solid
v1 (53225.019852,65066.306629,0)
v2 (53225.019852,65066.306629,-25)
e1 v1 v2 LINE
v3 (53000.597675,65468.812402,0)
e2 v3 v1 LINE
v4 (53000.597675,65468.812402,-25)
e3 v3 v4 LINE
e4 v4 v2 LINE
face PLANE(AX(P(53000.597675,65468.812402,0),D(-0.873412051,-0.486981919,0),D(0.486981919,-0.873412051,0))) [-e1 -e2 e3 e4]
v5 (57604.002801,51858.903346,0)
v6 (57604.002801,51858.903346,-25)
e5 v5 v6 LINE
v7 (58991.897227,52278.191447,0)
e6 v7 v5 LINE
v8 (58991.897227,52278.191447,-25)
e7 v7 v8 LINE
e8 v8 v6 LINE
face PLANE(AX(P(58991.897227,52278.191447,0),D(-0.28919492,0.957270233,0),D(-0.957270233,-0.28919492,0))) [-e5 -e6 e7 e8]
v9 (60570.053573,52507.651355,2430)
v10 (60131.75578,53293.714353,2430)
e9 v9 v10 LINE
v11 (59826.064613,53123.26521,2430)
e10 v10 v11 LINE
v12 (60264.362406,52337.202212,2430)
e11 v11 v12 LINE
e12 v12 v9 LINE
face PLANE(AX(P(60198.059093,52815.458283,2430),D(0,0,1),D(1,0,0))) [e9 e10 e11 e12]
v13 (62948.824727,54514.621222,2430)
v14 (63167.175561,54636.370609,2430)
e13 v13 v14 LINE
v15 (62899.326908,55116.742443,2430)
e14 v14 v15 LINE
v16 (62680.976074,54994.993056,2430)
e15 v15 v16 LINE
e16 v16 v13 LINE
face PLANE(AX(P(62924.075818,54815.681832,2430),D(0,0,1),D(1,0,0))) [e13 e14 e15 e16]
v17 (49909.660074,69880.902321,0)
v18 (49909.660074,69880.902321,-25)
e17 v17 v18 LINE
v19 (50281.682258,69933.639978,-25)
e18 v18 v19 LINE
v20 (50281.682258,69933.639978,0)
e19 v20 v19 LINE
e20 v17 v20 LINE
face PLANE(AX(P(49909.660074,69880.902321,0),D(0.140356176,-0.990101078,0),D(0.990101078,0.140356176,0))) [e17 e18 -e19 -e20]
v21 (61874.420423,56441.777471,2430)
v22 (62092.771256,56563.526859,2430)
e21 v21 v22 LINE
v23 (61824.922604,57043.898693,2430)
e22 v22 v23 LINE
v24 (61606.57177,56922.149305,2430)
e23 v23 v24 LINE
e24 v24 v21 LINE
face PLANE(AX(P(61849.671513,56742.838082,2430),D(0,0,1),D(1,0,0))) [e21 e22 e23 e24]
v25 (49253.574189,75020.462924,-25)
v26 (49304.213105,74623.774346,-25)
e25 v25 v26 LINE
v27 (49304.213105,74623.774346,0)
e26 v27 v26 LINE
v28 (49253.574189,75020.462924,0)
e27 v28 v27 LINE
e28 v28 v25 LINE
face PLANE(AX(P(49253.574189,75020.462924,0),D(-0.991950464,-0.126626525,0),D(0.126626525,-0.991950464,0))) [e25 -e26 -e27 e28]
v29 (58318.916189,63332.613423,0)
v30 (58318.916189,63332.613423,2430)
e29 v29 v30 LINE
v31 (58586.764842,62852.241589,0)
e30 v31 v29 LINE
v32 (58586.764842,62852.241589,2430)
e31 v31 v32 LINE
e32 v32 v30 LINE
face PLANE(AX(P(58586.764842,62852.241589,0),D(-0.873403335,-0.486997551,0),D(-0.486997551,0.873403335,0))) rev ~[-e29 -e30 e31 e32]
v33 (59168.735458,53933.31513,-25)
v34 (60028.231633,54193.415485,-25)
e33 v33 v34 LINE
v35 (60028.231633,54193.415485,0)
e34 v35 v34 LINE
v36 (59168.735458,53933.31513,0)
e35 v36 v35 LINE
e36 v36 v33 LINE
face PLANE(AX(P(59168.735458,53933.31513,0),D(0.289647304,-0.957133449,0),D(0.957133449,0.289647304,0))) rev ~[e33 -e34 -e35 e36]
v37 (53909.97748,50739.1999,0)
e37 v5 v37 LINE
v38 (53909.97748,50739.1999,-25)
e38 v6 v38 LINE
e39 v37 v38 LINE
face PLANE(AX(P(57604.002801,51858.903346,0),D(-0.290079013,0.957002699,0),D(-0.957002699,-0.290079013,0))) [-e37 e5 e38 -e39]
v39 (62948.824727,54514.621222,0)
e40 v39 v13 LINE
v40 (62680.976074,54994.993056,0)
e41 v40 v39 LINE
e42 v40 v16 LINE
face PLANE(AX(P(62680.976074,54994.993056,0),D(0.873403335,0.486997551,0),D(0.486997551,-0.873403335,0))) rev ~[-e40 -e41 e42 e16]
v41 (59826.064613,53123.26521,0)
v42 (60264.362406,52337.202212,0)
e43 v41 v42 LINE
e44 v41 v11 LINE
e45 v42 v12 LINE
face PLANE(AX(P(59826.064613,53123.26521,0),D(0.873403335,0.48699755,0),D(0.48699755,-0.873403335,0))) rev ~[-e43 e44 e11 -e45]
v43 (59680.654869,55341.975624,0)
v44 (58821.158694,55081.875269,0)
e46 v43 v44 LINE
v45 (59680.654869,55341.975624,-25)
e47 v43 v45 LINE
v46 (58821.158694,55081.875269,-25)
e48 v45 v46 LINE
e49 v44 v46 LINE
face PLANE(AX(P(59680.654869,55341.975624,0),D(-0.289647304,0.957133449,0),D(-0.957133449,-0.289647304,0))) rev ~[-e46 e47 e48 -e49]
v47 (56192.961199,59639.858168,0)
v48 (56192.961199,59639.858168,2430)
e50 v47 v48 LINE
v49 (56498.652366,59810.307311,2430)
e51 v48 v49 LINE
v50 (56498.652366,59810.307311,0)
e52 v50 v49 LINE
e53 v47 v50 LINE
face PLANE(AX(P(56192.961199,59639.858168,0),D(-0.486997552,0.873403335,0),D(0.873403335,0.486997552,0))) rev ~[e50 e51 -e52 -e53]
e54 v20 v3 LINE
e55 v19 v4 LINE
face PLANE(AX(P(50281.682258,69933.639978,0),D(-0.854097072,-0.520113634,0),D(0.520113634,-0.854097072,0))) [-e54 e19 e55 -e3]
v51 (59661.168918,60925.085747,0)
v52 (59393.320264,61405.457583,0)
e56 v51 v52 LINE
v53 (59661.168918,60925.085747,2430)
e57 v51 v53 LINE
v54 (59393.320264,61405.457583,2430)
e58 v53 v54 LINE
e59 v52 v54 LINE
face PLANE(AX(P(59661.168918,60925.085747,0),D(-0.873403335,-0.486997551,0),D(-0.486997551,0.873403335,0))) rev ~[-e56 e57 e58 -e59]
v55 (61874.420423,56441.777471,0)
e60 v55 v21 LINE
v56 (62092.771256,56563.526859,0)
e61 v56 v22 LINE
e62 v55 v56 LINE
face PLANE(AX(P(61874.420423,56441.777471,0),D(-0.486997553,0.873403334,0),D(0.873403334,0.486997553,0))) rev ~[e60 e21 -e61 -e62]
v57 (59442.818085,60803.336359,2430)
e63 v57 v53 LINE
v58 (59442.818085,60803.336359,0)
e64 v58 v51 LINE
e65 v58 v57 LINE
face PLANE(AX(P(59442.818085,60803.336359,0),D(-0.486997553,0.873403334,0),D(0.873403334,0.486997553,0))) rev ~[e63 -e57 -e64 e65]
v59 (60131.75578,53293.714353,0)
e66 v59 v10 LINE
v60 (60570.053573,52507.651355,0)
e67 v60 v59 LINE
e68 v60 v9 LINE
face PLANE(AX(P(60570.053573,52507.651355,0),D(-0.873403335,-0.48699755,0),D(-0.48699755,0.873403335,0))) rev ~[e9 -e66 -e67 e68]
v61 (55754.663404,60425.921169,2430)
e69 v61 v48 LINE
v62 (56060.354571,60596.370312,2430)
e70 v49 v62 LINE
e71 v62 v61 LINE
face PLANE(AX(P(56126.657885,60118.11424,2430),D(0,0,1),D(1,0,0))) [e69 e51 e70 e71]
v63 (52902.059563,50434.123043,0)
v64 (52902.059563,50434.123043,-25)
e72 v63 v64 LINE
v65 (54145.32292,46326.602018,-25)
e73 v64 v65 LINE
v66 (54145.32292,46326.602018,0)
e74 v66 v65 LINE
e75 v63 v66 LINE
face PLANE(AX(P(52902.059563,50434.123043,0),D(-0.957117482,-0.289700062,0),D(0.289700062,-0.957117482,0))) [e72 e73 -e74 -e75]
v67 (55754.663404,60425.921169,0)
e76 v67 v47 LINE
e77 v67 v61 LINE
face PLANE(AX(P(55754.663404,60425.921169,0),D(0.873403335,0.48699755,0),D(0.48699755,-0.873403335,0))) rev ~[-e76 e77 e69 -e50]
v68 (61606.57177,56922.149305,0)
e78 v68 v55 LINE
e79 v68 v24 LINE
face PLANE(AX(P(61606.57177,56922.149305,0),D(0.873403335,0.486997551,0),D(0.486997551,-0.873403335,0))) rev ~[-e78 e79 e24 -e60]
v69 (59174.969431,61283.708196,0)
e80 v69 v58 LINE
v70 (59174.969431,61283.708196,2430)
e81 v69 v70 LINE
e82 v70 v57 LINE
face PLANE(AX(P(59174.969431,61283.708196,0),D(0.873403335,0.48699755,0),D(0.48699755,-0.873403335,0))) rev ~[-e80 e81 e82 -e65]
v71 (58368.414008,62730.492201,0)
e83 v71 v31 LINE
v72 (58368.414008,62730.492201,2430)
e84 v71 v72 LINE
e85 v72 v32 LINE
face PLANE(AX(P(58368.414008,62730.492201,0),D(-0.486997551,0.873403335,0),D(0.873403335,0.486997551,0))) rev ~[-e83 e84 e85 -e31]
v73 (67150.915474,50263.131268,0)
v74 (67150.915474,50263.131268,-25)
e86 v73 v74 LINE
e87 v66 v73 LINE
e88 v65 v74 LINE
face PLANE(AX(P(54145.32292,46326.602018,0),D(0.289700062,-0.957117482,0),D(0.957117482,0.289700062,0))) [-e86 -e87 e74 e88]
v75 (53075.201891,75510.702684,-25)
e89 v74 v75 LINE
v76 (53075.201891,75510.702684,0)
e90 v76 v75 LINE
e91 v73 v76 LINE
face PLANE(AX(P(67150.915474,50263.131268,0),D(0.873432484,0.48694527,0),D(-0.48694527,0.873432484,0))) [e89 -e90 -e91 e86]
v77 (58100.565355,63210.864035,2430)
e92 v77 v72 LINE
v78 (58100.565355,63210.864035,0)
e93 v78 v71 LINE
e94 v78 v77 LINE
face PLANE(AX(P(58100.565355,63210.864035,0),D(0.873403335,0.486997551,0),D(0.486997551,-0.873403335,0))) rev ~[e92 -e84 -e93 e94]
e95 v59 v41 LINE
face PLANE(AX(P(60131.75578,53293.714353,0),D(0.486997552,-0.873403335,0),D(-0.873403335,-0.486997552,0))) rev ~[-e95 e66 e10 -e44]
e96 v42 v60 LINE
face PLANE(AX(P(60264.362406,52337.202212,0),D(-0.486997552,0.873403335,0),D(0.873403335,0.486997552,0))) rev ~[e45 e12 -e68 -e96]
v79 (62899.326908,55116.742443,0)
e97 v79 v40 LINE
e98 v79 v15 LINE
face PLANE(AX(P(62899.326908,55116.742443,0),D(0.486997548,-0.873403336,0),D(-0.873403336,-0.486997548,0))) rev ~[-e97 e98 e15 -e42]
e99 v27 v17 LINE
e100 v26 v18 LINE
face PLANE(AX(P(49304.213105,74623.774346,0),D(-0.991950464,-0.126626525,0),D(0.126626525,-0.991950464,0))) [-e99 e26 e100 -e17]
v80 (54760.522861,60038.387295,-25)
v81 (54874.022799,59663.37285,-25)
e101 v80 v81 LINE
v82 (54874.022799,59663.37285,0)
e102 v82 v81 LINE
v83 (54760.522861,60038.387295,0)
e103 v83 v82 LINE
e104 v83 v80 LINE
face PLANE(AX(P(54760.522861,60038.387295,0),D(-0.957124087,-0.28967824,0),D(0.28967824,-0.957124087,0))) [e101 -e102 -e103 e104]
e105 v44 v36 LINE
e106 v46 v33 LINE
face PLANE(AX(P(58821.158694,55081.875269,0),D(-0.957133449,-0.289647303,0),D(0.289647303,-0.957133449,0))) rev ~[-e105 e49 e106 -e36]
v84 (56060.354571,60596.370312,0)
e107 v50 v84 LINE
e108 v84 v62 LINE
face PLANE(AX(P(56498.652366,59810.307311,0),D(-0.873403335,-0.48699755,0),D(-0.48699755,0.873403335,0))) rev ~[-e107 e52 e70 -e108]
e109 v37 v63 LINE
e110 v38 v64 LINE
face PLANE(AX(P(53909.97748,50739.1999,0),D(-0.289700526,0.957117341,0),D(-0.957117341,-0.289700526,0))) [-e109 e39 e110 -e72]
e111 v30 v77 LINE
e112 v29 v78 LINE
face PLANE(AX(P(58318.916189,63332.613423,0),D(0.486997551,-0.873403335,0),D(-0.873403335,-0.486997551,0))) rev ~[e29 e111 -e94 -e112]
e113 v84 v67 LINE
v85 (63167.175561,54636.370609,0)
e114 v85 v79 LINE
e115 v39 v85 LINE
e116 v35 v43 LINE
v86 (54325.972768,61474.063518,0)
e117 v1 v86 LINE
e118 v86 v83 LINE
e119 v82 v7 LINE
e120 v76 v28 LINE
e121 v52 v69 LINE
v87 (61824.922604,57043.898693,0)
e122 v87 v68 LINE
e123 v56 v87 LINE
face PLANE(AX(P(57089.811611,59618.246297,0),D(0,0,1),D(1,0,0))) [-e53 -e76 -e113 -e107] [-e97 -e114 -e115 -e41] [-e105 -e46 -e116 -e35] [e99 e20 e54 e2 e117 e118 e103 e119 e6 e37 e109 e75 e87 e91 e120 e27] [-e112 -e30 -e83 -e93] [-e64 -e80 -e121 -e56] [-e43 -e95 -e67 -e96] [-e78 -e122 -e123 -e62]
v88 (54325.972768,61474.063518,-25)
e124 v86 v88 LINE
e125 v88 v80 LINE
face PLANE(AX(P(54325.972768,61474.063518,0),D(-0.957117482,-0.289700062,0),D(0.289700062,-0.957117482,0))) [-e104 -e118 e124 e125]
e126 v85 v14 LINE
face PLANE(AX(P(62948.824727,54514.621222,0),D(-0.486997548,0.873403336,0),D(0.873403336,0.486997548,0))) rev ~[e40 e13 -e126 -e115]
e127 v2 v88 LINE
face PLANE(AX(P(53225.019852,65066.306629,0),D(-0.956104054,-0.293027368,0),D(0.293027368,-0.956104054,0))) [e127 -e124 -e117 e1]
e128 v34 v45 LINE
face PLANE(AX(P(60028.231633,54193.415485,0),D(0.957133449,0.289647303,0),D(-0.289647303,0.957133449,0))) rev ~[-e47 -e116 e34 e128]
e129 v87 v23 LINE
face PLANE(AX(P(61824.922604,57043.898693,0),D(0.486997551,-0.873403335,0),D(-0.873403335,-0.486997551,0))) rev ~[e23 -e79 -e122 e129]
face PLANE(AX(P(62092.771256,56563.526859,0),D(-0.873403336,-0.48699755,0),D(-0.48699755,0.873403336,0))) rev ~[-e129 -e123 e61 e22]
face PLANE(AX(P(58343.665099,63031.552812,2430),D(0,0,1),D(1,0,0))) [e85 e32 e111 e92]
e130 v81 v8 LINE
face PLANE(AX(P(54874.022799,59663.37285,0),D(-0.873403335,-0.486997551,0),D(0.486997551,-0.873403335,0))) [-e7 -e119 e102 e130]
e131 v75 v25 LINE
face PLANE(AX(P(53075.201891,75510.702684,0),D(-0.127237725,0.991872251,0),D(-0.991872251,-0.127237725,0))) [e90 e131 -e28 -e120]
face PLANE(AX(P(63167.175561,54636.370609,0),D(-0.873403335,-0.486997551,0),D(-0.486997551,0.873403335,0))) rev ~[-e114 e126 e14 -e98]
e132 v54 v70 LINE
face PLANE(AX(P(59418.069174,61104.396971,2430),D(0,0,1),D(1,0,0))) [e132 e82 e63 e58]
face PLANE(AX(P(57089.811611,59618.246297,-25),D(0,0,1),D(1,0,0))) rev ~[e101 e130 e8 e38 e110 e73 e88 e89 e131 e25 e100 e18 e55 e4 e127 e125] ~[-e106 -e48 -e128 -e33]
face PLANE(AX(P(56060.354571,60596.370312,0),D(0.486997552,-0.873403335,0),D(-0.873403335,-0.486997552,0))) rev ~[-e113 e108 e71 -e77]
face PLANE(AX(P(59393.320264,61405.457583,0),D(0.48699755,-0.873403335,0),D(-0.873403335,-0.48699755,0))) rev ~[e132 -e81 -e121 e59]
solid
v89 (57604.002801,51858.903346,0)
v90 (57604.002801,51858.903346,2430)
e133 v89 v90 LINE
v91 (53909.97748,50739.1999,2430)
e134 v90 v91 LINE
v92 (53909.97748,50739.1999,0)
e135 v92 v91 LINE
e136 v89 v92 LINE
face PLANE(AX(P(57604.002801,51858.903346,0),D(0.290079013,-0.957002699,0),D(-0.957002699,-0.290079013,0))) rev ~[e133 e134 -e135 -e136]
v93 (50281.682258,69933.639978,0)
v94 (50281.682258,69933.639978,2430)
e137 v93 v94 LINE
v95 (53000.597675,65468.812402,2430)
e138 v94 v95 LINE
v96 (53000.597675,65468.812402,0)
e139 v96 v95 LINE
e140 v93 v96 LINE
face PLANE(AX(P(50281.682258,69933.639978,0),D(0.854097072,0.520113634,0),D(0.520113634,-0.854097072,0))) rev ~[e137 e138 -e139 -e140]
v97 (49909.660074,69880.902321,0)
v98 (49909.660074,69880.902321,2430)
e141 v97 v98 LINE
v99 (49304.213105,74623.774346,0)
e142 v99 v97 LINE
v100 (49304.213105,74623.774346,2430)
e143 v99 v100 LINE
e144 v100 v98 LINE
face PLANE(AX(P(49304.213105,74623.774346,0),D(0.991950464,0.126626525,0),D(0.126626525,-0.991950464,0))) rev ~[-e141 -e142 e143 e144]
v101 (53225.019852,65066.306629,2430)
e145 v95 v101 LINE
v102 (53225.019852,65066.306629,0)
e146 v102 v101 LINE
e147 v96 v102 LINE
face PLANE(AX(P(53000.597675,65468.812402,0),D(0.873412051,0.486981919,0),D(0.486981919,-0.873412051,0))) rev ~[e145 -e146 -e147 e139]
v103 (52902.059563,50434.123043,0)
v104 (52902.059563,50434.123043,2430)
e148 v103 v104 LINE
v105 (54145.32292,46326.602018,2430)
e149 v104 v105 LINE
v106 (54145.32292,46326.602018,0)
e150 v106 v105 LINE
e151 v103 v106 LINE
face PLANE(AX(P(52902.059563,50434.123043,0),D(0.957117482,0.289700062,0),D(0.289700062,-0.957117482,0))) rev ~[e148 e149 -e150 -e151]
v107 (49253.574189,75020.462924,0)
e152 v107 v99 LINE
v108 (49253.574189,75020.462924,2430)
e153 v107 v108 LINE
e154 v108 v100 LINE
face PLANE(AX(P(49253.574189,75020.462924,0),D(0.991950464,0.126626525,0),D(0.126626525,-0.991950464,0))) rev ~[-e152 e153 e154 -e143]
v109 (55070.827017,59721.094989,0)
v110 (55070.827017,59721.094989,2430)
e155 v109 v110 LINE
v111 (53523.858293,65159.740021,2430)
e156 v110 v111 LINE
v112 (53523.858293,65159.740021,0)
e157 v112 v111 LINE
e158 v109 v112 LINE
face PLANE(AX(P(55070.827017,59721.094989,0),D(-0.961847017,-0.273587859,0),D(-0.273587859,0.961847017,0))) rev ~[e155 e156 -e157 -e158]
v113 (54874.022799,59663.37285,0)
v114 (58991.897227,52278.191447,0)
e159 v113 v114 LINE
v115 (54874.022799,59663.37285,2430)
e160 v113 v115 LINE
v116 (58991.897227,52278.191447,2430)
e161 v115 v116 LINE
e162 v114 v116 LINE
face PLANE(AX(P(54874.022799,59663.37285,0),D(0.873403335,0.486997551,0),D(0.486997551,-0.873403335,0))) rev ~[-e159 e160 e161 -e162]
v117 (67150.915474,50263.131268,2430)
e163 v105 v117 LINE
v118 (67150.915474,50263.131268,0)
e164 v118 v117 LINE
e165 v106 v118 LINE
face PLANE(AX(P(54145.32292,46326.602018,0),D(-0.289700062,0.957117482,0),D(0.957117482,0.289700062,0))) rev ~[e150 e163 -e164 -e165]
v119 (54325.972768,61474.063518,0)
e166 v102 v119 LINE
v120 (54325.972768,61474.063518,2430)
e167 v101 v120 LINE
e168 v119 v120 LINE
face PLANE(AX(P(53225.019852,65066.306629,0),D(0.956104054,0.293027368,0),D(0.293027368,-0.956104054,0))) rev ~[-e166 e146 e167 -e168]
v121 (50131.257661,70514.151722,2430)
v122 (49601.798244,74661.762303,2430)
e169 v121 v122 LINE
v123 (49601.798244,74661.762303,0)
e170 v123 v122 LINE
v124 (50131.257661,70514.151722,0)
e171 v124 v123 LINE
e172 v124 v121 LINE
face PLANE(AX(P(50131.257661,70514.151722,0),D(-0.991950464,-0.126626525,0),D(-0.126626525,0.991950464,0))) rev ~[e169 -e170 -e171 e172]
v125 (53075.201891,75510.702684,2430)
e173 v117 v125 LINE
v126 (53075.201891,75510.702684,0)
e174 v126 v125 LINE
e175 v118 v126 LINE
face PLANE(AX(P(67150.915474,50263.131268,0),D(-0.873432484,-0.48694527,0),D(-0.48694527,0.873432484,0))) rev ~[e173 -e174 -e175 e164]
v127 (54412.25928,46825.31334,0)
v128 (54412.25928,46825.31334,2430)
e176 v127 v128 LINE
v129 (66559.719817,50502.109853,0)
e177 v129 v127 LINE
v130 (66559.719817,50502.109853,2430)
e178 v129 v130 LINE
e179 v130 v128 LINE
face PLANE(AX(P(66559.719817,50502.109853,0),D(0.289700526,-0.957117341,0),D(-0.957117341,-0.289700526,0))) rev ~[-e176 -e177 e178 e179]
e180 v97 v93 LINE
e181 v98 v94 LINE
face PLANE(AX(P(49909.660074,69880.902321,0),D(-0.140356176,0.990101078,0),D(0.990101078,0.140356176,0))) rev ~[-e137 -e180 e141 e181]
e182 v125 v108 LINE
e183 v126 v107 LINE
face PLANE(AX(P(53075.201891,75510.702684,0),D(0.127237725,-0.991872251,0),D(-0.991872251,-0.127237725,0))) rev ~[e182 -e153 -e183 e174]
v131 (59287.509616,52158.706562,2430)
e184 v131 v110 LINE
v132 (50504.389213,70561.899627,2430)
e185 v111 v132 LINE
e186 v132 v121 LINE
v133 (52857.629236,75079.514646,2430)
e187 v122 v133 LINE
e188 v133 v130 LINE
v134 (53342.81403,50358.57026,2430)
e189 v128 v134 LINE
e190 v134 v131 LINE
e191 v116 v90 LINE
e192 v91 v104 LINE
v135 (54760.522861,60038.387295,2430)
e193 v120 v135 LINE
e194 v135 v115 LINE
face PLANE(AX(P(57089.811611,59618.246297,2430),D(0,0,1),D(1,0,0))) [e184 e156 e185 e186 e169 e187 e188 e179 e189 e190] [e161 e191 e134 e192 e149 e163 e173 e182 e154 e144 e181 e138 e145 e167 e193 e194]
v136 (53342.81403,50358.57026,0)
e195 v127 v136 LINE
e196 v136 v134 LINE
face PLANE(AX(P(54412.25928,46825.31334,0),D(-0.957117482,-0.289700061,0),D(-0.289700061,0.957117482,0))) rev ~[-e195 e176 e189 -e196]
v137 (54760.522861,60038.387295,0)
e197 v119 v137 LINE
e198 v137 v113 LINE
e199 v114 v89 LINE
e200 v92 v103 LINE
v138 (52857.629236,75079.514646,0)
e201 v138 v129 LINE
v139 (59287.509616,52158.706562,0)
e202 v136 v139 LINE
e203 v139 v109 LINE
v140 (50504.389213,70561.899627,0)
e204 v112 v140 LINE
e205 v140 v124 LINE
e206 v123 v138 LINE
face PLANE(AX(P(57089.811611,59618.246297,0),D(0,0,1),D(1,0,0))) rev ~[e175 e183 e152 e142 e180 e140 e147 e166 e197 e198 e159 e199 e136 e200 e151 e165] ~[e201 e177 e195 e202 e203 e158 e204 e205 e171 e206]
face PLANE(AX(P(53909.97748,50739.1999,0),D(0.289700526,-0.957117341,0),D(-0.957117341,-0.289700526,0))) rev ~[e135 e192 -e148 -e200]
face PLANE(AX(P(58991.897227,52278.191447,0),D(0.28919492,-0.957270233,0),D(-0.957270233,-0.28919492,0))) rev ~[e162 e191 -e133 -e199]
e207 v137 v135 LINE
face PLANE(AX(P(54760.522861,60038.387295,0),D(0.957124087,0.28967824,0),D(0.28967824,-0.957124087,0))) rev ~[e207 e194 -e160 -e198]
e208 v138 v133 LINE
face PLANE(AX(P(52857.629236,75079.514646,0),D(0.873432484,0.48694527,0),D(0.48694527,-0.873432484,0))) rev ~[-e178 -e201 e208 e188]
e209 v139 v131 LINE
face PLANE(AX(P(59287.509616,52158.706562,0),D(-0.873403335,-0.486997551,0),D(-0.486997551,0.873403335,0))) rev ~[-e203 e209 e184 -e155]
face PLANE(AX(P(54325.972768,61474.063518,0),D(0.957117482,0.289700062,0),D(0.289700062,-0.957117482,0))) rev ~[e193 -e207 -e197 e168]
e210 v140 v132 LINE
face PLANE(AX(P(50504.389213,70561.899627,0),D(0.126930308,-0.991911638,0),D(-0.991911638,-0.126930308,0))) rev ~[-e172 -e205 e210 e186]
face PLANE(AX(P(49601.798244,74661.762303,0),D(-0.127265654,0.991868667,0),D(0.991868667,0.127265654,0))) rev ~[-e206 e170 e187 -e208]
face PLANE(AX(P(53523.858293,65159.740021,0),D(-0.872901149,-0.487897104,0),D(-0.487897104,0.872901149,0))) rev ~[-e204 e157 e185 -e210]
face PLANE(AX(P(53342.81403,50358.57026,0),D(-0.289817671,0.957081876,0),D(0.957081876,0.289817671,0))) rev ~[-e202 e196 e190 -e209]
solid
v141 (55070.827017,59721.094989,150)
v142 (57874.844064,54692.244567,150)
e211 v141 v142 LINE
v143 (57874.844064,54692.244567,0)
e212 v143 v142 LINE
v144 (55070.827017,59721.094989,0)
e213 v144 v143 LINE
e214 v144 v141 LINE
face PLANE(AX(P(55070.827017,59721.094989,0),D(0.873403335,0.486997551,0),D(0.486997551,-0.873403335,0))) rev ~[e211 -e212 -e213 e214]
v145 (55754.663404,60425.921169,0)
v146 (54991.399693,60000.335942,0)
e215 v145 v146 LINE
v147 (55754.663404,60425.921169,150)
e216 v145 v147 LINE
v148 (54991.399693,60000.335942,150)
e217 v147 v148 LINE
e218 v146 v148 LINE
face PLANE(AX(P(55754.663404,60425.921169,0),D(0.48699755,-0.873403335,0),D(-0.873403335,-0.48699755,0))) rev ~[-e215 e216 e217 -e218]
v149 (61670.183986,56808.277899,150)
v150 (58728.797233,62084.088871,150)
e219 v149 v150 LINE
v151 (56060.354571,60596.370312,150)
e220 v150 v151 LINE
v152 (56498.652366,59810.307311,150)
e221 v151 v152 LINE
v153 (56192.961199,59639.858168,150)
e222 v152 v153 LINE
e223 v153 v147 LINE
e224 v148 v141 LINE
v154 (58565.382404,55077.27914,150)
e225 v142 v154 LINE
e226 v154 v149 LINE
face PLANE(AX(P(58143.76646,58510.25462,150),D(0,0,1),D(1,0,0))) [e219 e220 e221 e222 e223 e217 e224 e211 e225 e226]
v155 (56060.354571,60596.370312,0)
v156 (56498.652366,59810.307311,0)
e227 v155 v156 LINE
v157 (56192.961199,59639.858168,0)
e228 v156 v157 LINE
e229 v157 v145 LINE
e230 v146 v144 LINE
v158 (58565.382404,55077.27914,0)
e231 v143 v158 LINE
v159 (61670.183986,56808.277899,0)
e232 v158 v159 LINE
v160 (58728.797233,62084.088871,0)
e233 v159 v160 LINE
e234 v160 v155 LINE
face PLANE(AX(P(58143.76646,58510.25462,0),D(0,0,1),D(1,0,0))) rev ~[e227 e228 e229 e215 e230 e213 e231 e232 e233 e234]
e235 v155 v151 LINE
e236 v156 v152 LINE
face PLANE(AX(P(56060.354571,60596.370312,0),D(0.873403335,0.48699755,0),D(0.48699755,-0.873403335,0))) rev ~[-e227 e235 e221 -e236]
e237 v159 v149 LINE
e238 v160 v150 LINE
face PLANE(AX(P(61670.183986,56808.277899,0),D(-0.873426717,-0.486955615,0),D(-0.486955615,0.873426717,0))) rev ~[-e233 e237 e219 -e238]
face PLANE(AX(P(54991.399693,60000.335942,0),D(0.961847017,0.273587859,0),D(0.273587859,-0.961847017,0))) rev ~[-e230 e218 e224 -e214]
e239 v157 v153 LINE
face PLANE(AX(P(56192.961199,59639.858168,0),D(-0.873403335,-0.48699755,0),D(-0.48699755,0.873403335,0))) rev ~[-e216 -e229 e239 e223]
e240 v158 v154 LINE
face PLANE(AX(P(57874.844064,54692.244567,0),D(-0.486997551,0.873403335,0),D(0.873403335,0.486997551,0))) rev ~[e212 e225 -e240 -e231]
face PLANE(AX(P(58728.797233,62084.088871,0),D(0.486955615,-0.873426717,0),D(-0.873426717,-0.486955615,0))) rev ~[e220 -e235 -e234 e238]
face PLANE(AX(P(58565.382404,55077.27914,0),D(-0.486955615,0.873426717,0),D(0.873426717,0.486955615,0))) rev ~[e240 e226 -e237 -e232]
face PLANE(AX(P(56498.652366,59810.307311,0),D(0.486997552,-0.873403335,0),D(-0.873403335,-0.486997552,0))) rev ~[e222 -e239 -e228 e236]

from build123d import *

# Parameters (mm, degrees)
F3_DEPTH  = 2430
F5_DEPTH  = 25
F7_DEPTH  = 2430
F9_DEPTH  = 150
F11_DEPTH = 25.001


# Not quite as in the source:
# - ends of sketch curves that miss each other by under 0.0002 mm in the source are joined


with BuildPart() as f3:
    # F2 (on Top) → F3 (new body)
    with BuildSketch(Plane.XY):
        Polygon((52902.0595629306, 50434.1230428591), (54145.32292, 46326.602018), (54431.4219269024, 46413.1983883223), (67150.915474, 50263.131268), (53075.201891, 75510.702684), (49253.5741891713, 75020.4629237414), (49304.213105, 74623.774346), (49909.660074, 69880.902321), (50281.682258, 69933.639978), (53000.597675, 65468.812402), (53225.019852, 65066.306629), (54325.972768, 61474.063518), (54760.522861, 60038.387295), (54874.022799, 59663.37285), (58991.897227, 52278.191447), (57604.002801, 51858.903346), (53909.97748, 50739.1999), align=None)
        Polygon((54412.25928, 46825.31334), (53342.81403, 50358.57026), (59287.509616, 52158.706562), (55070.827017, 59721.094989), (53523.858293, 65159.740021), (50504.389213421, 70561.8996273451), (50131.257661, 70514.151722), (49601.798244, 74661.762303), (52857.629236, 75079.514646), (66559.719817, 50502.109853), align=None, mode=Mode.SUBTRACT)
    extrude(amount=F3_DEPTH)


with BuildPart() as f5:
    # F4 (on Top) → F5 (new body)
    with BuildSketch(Plane.XY):
        Polygon((54760.522861, 60038.387295), (54874.022799, 59663.37285), (58991.897227, 52278.191447), (57604.002801, 51858.903346), (53909.97748, 50739.1999), (52902.0595629306, 50434.1230428591), (54145.32292, 46326.602018), (67150.915474, 50263.131268), (53075.201891, 75510.702684), (49253.5741891713, 75020.4629237414), (49304.213105, 74623.774346), (49909.660074, 69880.902321), (50281.682258, 69933.639978), (53000.597675, 65468.812402), (53225.019852, 65066.306629), (54325.972768, 61474.063518), align=None)
    extrude(amount=-F5_DEPTH)

    # F6 (on Top) → F7 (join)
    with BuildSketch(Plane.XY):
        Polygon((63167.175561, 54636.370609), (62899.326908, 55116.742443), (62680.976074, 54994.993056), (62948.824727, 54514.621222), align=None)
        Polygon((61606.57177, 56922.149305), (61874.420423, 56441.777471), (62092.771256, 56563.526859), (61824.922604, 57043.898693), align=None)
        Polygon((60131.75578, 53293.714353), (59826.064613, 53123.26521), (60264.362406, 52337.202212), (60570.053573, 52507.651355), align=None)
        Polygon((56498.652366, 59810.307311), (56060.354571, 60596.370312), (55754.663404, 60425.921169), (56192.961199, 59639.858168), align=None)
        Polygon((59393.320264, 61405.457583), (59174.969431, 61283.708196), (59442.818085, 60803.336359), (59661.168918, 60925.085747), align=None)
        Polygon((58586.764842, 62852.241589), (58318.916189, 63332.613423), (58100.565355, 63210.864035), (58368.414008, 62730.492201), align=None)
    extrude(amount=F7_DEPTH)

    # F10 (on face) → F11 (cut, through all)
    with BuildSketch(Plane.XY):
        Polygon((59168.735458, 53933.31513), (60028.231633, 54193.415485), (59680.654869, 55341.975624), (58821.158694, 55081.875269), align=None)
    extrude(amount=-F11_DEPTH, mode=Mode.SUBTRACT)


with BuildPart() as f9:
    # F8 (on Top) → F9 (new body)
    with BuildSketch(Plane.XY):
        Polygon((58728.797232615, 62084.088870835), (56060.354571, 60596.370312), (56498.652366, 59810.307311), (56192.961199, 59639.858168), (55754.663404, 60425.921169), (54991.3996931603, 60000.3359416475), (55070.827017, 59721.094989), (55102.8168784927, 59663.7229310719), (57874.844064254, 54692.2445670372), (58565.3824039826, 55077.2791403316), (61670.1839855803, 56808.2778988538), align=None)
    extrude(amount=F9_DEPTH)


solid = Compound([f3.part, f5.part, f9.part])
